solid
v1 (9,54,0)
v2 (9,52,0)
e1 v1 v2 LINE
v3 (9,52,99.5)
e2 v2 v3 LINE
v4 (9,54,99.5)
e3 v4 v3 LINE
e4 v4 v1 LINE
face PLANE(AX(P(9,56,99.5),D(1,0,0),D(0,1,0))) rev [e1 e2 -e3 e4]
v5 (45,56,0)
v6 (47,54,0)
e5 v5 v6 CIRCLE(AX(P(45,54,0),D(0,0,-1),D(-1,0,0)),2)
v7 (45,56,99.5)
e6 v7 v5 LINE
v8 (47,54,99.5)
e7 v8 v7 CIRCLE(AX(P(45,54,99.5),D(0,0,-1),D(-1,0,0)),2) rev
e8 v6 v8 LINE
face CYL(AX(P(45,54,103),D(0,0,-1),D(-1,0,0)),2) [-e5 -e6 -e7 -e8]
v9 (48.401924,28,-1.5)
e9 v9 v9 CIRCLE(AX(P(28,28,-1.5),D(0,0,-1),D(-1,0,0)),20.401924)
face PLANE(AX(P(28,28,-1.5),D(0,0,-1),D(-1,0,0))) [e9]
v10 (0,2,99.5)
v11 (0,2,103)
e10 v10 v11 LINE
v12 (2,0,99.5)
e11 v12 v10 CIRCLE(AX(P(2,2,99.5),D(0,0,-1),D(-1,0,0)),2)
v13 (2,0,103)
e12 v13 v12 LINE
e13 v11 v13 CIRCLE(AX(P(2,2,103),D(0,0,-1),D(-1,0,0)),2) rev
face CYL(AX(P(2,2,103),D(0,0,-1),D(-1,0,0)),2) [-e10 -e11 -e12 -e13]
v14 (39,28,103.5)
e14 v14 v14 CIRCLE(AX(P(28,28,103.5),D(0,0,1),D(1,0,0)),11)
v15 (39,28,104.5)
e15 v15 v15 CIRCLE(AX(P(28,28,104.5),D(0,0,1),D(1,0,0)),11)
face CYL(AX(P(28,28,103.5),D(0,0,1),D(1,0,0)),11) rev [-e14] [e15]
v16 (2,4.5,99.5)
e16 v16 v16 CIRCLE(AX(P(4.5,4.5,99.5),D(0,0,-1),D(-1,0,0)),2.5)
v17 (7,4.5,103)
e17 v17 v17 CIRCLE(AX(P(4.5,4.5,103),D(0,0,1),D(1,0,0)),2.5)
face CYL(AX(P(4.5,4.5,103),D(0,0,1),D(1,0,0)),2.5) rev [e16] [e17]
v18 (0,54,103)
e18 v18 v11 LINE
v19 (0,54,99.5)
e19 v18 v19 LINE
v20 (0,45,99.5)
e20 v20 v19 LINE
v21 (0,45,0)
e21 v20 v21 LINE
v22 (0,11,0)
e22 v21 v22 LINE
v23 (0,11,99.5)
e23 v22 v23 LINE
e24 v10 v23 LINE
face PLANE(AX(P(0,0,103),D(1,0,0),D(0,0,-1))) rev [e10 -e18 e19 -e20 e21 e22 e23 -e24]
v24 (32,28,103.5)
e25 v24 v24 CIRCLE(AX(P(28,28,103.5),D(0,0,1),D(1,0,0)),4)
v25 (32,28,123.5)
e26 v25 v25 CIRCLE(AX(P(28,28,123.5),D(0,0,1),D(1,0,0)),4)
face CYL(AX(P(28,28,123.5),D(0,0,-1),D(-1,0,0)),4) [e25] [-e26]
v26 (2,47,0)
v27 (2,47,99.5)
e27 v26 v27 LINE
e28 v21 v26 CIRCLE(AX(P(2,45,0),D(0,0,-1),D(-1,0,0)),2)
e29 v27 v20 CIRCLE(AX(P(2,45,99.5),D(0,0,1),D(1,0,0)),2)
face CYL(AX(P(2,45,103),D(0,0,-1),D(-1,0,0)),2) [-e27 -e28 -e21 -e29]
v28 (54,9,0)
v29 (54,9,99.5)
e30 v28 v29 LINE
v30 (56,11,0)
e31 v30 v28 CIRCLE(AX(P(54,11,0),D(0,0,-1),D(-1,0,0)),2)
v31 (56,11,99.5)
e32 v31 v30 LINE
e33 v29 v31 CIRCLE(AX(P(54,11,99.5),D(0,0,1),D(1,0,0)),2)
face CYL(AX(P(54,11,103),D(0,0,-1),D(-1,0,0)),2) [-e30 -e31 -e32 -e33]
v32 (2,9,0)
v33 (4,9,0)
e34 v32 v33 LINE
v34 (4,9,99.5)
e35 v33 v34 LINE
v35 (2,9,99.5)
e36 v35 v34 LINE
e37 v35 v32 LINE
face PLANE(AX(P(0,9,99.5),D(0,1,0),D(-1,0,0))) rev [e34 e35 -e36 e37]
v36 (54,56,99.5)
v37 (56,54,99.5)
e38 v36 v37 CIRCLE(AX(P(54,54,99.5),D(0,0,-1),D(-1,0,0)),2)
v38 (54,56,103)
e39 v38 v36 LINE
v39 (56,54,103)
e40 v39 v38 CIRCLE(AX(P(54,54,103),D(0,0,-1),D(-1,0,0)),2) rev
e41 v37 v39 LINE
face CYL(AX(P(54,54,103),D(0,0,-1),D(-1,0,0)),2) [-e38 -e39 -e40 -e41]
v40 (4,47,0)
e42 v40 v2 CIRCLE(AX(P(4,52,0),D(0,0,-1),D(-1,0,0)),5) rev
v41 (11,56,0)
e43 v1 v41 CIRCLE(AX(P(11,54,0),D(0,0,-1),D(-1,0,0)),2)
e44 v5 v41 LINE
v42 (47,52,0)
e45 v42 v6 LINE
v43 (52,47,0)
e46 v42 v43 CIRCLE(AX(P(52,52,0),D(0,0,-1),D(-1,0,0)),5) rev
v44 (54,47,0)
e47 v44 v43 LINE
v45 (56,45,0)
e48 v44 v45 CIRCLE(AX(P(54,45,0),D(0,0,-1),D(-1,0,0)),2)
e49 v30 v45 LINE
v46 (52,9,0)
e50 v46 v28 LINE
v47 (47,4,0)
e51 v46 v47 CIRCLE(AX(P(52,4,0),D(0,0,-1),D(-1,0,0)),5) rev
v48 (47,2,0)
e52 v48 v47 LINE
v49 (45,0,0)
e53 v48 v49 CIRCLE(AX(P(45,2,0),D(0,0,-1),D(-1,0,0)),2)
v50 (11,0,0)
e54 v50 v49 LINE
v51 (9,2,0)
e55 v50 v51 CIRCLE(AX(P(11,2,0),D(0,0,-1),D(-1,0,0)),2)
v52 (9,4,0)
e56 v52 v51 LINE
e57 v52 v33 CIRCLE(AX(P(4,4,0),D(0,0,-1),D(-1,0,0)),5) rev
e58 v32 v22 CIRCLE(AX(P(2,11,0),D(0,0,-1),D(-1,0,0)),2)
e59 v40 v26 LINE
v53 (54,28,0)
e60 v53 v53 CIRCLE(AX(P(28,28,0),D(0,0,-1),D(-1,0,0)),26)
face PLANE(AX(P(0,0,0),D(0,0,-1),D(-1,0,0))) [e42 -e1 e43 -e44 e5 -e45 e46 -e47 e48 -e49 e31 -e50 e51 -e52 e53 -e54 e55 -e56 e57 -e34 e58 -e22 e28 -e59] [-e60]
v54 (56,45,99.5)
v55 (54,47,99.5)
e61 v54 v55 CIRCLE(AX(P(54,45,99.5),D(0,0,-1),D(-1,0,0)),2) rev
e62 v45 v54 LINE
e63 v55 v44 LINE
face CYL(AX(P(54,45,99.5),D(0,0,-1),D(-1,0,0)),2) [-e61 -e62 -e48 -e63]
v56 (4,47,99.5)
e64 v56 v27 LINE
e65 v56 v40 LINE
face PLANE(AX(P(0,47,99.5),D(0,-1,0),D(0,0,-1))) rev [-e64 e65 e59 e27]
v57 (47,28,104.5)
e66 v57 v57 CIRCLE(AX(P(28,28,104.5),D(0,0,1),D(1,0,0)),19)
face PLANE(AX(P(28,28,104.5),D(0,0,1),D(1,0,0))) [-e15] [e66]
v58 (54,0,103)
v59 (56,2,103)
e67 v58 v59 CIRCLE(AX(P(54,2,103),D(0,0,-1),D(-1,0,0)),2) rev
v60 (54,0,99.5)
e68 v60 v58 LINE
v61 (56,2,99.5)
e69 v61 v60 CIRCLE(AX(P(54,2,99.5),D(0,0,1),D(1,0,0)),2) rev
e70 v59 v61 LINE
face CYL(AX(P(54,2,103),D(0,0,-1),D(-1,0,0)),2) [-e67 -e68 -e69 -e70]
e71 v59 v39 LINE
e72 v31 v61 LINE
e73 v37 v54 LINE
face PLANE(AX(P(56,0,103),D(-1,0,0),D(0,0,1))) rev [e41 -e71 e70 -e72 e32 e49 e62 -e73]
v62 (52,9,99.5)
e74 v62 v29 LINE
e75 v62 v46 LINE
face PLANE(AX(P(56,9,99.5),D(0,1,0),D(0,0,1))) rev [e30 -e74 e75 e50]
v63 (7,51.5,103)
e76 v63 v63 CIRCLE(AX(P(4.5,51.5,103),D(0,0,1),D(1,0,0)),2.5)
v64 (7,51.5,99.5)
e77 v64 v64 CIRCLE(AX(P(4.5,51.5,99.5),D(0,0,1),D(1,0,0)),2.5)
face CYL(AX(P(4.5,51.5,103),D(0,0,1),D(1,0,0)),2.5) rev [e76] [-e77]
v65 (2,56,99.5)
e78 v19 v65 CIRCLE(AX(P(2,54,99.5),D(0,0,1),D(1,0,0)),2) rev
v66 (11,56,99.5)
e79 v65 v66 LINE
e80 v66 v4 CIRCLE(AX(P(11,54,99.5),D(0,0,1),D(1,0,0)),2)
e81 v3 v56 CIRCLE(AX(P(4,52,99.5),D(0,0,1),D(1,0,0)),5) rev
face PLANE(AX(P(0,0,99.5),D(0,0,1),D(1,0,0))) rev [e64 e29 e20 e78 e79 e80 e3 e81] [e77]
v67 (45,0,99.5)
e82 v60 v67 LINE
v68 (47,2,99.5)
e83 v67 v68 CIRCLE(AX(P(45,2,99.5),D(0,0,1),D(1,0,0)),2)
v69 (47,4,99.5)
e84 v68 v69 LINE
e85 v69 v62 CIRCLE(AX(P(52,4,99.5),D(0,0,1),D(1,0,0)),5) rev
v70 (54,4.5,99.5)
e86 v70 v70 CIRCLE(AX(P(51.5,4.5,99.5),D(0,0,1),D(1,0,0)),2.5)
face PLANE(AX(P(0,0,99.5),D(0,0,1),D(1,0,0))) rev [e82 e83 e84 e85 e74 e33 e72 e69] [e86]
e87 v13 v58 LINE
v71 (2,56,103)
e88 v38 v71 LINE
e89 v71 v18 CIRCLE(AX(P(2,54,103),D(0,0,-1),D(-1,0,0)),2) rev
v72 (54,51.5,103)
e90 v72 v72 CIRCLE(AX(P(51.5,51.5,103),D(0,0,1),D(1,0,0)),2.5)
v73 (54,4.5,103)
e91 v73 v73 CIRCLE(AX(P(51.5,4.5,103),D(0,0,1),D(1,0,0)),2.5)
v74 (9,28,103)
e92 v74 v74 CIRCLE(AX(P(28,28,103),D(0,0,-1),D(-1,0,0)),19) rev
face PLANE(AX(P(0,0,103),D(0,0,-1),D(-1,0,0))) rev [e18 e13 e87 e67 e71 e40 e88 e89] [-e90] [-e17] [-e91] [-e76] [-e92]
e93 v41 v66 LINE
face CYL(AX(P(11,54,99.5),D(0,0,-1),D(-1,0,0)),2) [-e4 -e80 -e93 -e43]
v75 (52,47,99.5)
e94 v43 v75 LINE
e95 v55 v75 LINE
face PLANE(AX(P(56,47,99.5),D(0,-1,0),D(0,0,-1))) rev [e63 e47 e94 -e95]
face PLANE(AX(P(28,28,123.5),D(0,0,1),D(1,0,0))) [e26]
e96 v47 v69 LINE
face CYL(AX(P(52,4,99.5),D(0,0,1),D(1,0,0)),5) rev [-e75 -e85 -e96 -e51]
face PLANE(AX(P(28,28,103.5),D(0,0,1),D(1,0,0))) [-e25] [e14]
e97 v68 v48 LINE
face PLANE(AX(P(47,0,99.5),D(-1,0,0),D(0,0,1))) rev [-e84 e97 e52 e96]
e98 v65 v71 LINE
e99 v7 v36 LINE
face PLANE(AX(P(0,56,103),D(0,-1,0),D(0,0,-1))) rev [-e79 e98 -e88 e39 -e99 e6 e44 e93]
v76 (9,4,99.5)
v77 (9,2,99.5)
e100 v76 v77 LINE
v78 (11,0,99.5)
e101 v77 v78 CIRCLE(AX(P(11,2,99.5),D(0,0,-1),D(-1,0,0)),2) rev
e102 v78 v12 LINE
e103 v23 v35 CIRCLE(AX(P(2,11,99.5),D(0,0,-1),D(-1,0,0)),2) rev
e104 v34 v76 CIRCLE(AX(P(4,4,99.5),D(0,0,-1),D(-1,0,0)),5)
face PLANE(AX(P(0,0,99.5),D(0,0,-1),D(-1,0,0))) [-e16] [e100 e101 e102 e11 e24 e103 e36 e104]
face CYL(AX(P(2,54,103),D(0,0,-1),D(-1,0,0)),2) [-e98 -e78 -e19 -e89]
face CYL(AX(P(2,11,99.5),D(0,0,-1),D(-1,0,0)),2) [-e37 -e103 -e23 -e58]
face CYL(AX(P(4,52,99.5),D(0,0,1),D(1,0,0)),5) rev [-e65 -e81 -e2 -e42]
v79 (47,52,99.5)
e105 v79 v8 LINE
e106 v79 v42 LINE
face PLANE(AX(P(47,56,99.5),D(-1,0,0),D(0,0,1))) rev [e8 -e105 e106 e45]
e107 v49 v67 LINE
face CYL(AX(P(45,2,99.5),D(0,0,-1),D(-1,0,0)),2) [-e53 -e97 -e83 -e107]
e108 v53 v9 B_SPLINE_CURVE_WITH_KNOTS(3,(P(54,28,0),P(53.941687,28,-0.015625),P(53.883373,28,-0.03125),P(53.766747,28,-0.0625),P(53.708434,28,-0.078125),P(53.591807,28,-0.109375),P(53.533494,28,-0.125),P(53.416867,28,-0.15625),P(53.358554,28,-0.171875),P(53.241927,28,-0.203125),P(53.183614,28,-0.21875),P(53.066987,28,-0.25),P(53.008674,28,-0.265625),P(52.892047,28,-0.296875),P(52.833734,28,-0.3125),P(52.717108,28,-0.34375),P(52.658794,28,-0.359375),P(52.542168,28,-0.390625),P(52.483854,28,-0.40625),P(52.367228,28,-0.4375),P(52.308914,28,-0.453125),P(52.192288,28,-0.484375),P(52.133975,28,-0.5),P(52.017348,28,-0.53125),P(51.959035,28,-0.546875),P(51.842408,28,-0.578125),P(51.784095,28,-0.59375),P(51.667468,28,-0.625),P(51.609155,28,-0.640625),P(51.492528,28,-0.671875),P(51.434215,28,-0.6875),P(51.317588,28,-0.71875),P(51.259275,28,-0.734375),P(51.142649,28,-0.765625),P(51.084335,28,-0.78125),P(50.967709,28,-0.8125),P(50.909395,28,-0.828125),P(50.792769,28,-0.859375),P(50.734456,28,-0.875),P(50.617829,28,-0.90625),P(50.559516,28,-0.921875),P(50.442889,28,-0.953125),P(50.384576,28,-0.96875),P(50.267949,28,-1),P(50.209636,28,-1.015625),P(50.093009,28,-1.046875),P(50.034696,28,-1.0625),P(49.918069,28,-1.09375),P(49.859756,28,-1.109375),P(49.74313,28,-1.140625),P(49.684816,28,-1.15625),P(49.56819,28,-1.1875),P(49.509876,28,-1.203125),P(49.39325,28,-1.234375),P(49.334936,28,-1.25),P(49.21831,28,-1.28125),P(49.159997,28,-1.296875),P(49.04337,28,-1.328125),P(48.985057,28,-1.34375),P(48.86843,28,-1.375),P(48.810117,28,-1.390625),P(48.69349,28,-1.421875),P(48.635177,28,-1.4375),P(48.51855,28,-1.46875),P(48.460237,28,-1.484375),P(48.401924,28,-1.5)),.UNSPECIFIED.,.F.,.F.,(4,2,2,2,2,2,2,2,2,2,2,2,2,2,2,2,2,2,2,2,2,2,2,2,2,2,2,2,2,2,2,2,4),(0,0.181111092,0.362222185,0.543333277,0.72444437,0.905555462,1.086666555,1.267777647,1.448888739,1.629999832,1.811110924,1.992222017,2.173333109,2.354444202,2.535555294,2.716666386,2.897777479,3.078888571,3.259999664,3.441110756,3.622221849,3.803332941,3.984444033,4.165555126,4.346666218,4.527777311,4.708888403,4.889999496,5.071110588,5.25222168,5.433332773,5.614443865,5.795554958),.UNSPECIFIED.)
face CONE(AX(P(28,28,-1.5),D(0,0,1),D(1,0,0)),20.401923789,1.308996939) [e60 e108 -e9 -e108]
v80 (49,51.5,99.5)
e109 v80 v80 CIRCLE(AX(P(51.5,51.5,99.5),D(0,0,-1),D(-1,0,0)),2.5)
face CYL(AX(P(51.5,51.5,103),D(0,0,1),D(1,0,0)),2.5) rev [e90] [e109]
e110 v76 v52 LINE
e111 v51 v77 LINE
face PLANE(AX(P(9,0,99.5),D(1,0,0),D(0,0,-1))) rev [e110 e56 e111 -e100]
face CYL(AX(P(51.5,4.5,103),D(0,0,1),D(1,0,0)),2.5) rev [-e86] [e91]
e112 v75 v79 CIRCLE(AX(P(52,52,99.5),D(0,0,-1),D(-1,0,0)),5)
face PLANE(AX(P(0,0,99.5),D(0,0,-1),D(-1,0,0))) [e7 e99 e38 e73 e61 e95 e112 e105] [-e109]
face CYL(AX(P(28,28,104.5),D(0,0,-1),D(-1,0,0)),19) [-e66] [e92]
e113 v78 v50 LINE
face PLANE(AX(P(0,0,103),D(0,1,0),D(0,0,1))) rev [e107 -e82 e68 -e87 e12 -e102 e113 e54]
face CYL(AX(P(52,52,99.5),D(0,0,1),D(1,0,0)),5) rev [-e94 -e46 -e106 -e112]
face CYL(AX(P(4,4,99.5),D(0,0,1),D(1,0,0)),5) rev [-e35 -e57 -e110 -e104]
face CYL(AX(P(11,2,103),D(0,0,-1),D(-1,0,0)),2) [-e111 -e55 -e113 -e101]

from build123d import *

# Parameters (mm, degrees)
SKETCH_1_W                = 56
SKETCH_1_H                = 56
EXTRUDE_1_DEPTH           = 103
SKETCH_2_W                = 9
SKETCH_2_H                = 9
CUT_EXTRUDE_1_DEPTH       = 99.5
HOLE_WIZARD_5_0_5_1_D     = 5
HOLE_WIZARD_5_0_5_1_DEPTH = 10
HOLE_WIZARD_5_0_5_1_TIP   = 1.502151548
FILLET_2_R                = 5
SKETCH_5_R                = 19
EXTRUDE_2_DEPTH           = 1.5
SKETCH_6_R                = 11
CUT_EXTRUDE_2_DEPTH       = 1
SKETCH_7_R                = 4
EXTRUDE_3_DEPTH           = 20
FILLET_3_R                = 2
SKETCH_8_R                = 26
EXTRUDE_4_DEPTH           = 1.5
CHAMFER_1_SIZE2           = 5.598076211
CHAMFER_1_SIZE            = 1.5


with BuildPart() as part:
    # 草图1 → 凸台-拉伸1 (new body)
    with BuildSketch(Plane.XY):
        with Locations((28, 28)):
            Rectangle(SKETCH_1_W, SKETCH_1_H)
    extrude(amount=EXTRUDE_1_DEPTH)

    # 草图2 → 切除-拉伸1 (cut)
    with BuildSketch(Plane(origin=(0, 0, 0), x_dir=(-1, 0, 0), z_dir=(0, 0, -1))):
        with Locations((-51.5, 4.5)):
            Rectangle(SKETCH_2_W, SKETCH_2_H)
        with Locations((-51.5, 51.5)):
            Rectangle(SKETCH_2_W, SKETCH_2_H)
        with Locations((-4.5, 51.5)):
            Rectangle(SKETCH_2_W, SKETCH_2_H)
        with Locations((-4.5, 4.5)):
            Rectangle(SKETCH_2_W, SKETCH_2_H)
    extrude(amount=-CUT_EXTRUDE_1_DEPTH, mode=Mode.SUBTRACT)

    # Ø5.0 (5) 直径孔1
    with Locations(Plane.XY.offset(103)):
        with Locations((4.5, 51.5), (51.5, 51.5), (51.5, 4.5), (4.5, 4.5)):
            Hole(HOLE_WIZARD_5_0_5_1_D / 2, depth=HOLE_WIZARD_5_0_5_1_DEPTH)
            with Locations((0, 0, -(HOLE_WIZARD_5_0_5_1_DEPTH + HOLE_WIZARD_5_0_5_1_TIP / 2))):  # 118° drill point
                Cone(0, HOLE_WIZARD_5_0_5_1_D / 2, HOLE_WIZARD_5_0_5_1_TIP, mode=Mode.SUBTRACT)

    # 圆角2
    fillet_2_edges = [part.edges().sort_by_distance(p)[0] for p in [
        (47, 9, 49.75),
        (47, 47, 49.75),
        (9, 47, 49.75),
        (9, 9, 49.75),
    ]]
    fillet(fillet_2_edges, radius=FILLET_2_R)

    # 草图5 → 凸台-拉伸2 (add)
    with BuildSketch(Plane.XY.offset(103)):
        with Locations(Location((28, 28, 0), (0, 0, 180))):
            Circle(SKETCH_5_R)
    extrude(amount=EXTRUDE_2_DEPTH)

    # 草图6 → 切除-拉伸2 (cut)
    with BuildSketch(Plane.XY.offset(104.5)):
        with Locations((28, 28)):
            Circle(SKETCH_6_R)
    extrude(amount=-CUT_EXTRUDE_2_DEPTH, mode=Mode.SUBTRACT)

    # 草图7 → 凸台-拉伸3 (add)
    with BuildSketch(Plane.XY.offset(103.5)):
        with Locations((28, 28)):
            Circle(SKETCH_7_R)
    extrude(amount=EXTRUDE_3_DEPTH)

    # 圆角3
    fillet_3_edges = [part.edges().sort_by_distance(p)[0] for p in [
        (56, 9, 49.75),
        (47, 0, 49.75),
        (56, 47, 49.75),
        (47, 56, 49.75),
        (0, 47, 49.75),
        (9, 56, 49.75),
        (0, 9, 49.75),
        (9, 0, 49.75),
        (0, 56, 101.25),
        (56, 56, 101.25),
        (56, 0, 101.25),
        (0, 0, 101.25),
    ]]
    fillet(fillet_3_edges, radius=FILLET_3_R)

    # 草图8 → 凸台-拉伸4 (add)
    with BuildSketch(Plane(origin=(0, 0, 0), x_dir=(-1, 0, 0), z_dir=(0, 0, -1))):
        with Locations((-28, 28)):
            Circle(SKETCH_8_R)
    extrude(amount=EXTRUDE_4_DEPTH)

    # 倒角1
    chamfer_1_edges = [part.edges().sort_by_distance(p)[0] for p in [
        (54, 28, -1.5),
    ]]
    chamfer_1_side = [part.faces().sort_by_distance(p)[0] for p in [
        (54, 28, -1.47),
    ]]
    chamfer(chamfer_1_edges, length=CHAMFER_1_SIZE - 0.0001, length2=CHAMFER_1_SIZE2 - 0.0001, reference=chamfer_1_side[0])  # a hair under: the kernel refuses the full size


solid = part.part
